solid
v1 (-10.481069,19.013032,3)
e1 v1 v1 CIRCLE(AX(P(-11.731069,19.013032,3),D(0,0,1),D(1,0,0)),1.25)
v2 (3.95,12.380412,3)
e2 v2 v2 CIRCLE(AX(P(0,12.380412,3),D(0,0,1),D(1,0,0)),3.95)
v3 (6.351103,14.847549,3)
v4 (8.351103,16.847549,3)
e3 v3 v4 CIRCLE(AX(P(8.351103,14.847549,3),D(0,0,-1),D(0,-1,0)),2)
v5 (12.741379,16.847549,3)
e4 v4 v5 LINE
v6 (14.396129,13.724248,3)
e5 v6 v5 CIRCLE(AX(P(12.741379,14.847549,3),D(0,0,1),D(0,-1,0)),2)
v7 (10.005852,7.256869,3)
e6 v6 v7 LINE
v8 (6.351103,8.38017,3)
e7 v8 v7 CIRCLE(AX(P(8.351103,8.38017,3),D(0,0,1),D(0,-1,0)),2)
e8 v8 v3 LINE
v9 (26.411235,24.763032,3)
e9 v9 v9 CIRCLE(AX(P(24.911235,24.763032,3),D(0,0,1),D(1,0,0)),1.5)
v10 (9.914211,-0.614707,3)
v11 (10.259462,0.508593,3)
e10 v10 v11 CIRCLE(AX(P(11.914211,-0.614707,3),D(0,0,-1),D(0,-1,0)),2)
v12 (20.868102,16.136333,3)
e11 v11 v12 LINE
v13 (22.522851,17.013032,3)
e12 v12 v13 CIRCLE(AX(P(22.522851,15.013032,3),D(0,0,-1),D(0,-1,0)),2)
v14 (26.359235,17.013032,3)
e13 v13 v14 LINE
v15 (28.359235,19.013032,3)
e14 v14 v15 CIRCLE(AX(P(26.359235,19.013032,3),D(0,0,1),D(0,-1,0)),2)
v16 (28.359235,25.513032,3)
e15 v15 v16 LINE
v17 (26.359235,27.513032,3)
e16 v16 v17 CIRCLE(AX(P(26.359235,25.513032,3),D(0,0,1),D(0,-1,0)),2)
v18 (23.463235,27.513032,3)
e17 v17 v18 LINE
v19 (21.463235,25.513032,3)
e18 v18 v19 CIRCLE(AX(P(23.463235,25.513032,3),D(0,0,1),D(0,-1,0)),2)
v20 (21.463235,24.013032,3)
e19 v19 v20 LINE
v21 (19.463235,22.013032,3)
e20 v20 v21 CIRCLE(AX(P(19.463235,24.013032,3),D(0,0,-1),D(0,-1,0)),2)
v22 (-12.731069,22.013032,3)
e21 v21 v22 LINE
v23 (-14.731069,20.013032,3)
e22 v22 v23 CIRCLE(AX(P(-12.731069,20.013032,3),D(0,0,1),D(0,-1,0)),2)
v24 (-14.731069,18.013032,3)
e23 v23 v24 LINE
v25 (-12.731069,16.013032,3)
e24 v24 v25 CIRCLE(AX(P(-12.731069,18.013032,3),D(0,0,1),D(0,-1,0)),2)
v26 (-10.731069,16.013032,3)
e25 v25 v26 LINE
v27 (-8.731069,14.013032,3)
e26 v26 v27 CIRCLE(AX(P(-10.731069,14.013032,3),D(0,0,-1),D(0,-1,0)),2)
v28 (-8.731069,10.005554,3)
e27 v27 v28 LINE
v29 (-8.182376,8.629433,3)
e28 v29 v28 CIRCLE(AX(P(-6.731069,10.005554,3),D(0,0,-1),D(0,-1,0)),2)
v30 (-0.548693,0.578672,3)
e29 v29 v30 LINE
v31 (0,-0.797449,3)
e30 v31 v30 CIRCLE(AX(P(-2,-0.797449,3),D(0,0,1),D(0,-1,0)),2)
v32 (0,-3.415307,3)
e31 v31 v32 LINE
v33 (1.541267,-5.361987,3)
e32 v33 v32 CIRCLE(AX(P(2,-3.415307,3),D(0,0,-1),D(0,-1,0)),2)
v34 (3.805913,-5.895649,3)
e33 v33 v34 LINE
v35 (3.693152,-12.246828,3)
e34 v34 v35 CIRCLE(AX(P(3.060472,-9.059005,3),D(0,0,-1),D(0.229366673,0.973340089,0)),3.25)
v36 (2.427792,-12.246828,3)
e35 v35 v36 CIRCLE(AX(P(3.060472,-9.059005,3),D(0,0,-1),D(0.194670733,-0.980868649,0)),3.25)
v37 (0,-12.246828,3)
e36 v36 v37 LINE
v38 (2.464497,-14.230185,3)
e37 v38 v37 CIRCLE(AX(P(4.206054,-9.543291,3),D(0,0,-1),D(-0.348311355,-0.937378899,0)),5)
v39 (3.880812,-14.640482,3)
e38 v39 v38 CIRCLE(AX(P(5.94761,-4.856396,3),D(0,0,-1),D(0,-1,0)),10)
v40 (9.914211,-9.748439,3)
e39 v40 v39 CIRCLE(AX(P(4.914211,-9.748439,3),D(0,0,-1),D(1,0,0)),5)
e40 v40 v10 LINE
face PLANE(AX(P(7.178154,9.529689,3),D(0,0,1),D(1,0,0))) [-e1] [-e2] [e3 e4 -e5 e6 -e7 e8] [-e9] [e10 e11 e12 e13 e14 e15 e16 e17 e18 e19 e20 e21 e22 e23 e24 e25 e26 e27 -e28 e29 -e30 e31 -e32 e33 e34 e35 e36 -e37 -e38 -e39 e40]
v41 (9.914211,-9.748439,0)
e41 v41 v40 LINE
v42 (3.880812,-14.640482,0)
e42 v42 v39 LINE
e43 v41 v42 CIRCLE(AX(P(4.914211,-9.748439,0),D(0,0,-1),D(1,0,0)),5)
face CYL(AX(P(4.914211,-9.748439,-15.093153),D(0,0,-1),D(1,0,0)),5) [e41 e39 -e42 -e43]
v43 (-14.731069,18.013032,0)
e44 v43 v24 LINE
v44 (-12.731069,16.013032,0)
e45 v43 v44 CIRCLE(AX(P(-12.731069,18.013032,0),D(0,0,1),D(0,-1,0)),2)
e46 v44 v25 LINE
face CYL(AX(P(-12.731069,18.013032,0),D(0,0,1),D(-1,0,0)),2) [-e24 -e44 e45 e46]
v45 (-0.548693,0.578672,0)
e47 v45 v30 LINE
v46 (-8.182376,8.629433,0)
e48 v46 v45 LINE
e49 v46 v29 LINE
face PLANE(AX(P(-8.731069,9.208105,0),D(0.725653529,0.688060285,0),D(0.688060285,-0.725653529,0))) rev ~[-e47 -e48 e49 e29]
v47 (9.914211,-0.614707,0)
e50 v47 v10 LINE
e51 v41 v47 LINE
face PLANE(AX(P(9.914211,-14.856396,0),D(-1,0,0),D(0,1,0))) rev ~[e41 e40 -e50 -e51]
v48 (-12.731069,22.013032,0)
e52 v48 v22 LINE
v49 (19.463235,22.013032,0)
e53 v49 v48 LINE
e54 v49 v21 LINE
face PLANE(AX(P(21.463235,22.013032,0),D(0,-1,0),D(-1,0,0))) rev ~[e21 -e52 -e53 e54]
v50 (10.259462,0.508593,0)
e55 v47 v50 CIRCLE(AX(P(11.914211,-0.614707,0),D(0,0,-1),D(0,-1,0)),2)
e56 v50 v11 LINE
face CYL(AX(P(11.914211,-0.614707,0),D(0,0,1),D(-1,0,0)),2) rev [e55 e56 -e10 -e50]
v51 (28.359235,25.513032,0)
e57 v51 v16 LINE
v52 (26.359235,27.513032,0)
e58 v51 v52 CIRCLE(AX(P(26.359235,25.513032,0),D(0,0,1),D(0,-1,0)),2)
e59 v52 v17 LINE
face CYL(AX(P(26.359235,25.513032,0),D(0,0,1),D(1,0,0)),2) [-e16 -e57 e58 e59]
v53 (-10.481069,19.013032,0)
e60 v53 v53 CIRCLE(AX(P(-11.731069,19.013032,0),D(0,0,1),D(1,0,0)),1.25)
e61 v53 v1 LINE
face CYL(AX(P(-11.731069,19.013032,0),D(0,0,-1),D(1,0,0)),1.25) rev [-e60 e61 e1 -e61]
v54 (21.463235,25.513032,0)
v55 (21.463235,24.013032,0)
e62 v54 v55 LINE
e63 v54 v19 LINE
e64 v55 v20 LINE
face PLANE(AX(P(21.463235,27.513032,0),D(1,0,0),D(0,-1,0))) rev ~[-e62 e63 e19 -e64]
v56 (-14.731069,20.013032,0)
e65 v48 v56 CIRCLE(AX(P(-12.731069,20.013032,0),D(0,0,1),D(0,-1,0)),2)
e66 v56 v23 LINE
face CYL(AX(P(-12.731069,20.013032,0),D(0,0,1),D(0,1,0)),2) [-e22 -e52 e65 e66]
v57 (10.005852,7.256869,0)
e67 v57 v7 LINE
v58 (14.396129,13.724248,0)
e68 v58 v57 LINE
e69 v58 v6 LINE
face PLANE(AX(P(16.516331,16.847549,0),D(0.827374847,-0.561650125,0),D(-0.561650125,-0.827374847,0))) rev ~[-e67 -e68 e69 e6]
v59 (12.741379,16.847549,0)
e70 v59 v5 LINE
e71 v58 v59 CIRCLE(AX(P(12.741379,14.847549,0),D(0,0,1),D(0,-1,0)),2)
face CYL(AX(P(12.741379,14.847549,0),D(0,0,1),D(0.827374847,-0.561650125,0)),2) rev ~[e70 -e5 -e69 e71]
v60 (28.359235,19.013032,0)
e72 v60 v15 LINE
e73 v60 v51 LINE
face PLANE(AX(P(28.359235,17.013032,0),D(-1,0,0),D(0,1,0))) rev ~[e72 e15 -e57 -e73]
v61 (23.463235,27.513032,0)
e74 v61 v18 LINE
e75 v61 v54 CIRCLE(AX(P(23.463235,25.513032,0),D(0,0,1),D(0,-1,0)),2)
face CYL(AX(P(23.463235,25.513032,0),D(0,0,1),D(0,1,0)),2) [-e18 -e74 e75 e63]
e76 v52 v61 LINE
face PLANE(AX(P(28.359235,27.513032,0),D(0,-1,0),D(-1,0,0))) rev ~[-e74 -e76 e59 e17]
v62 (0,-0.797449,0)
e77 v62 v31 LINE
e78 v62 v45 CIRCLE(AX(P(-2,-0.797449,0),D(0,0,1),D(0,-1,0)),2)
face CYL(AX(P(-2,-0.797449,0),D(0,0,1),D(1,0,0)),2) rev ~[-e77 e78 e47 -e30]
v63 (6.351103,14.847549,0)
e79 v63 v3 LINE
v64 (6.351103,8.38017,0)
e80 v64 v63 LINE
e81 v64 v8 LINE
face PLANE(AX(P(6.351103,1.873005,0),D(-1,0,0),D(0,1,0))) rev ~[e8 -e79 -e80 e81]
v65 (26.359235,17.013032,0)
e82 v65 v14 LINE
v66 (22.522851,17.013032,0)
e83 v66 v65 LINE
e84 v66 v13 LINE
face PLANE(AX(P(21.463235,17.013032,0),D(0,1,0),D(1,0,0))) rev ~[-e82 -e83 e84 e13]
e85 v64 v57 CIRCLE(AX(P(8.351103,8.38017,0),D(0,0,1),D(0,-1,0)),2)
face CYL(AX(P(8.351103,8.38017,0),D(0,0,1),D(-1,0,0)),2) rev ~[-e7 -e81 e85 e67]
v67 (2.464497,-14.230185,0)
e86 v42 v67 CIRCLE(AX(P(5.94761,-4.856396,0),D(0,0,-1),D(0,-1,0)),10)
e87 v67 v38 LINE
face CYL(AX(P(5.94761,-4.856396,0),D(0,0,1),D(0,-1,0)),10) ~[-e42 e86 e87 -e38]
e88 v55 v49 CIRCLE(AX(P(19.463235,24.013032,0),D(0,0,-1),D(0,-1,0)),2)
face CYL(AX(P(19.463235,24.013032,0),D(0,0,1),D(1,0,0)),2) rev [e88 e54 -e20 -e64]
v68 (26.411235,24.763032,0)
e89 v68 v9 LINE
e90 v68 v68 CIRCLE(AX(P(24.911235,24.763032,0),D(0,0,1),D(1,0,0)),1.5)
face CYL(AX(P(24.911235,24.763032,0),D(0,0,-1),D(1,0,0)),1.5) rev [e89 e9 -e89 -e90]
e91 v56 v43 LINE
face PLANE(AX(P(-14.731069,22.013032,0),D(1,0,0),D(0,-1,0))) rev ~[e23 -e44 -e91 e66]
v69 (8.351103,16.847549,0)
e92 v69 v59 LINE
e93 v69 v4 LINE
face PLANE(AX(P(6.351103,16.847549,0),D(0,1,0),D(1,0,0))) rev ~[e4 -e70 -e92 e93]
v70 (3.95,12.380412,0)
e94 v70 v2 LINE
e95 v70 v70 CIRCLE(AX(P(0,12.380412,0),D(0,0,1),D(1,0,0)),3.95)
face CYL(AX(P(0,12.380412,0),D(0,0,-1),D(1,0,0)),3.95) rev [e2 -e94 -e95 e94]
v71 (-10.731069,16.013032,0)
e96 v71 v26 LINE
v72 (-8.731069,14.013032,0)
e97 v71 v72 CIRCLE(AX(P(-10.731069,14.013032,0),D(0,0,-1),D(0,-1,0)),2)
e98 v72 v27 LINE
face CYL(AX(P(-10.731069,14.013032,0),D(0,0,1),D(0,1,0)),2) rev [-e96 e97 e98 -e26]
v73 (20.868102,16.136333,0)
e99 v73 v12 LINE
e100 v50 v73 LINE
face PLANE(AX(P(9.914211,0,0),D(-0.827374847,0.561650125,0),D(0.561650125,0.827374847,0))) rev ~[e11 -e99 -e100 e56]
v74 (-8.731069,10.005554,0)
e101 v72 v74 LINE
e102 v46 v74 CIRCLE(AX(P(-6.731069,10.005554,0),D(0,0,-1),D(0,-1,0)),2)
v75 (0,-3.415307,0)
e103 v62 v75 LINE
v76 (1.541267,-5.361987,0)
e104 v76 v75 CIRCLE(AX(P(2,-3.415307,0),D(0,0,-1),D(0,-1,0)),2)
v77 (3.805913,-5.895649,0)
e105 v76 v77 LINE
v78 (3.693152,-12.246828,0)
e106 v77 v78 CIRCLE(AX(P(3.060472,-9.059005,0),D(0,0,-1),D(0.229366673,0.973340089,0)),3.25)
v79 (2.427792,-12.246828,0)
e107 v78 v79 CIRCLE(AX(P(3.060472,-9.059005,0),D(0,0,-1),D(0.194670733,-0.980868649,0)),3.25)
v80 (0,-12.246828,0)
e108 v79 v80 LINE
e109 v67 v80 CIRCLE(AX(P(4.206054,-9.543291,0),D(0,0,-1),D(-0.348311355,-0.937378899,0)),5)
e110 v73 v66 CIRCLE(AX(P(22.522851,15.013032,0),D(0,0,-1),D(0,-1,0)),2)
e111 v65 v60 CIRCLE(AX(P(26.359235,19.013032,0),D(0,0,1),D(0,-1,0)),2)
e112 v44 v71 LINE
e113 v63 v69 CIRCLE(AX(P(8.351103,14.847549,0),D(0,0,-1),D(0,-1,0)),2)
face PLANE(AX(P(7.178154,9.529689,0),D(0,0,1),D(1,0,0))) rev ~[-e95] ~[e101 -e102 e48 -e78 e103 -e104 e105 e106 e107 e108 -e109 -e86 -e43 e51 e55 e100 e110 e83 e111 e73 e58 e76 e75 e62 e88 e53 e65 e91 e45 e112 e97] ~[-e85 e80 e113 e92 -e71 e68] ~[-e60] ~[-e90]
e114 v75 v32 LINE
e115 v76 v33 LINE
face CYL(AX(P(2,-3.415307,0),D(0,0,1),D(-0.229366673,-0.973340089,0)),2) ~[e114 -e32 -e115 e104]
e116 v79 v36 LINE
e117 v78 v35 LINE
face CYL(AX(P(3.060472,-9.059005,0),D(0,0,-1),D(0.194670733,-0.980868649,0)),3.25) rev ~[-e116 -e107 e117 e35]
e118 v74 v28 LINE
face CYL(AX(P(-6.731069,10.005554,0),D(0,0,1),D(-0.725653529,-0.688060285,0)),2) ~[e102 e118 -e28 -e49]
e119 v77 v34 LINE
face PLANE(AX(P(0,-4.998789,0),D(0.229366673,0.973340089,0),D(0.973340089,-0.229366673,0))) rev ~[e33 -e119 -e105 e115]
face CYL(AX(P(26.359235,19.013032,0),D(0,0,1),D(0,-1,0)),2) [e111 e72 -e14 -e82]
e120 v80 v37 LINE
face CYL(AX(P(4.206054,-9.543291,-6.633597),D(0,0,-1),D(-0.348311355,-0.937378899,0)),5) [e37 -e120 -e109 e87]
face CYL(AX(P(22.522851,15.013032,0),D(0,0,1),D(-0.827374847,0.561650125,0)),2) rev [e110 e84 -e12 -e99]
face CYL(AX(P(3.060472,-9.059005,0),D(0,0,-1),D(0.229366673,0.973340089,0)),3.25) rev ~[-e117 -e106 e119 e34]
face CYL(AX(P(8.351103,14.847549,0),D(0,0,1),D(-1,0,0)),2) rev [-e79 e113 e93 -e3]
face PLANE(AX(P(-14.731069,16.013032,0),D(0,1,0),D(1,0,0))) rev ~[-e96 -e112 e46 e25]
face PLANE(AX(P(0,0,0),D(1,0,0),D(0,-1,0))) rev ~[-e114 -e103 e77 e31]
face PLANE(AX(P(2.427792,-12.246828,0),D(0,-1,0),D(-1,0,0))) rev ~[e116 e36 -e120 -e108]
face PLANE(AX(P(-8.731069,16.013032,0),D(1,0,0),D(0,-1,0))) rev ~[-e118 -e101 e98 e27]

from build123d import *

# Parameters (mm, degrees)
F0_R        = 3.95
F0_R_2      = 1.25
F0_R_3      = 1.5
F1_DEPTH    = 3
F2_R        = 10
F3_R        = 2
F4_T1_DEPTH = 16.2671931878
F4_T3_DEPTH = 33.1863063341


# Not quite as in the source:
# - a fillet or chamfer that OpenCascade refuses, or shapes differently, is made with other operations: its cross-section is extruded or revolved along the edge and cut away or added
# - a feature names something its author has since deleted; it is built from what else it names


with BuildPart() as f1:
    # F0 (on Top) → F1 (new body)
    with BuildSketch(Plane.XY):
        with BuildLine():
            Line((4.0200765709, -14.8563961814), (9.9142113018, -14.8563961814))
            Line((9.9142113018, -14.8563961814), (9.9142113018, -11.4412054596))
            Line((9.9142113018, -11.4412054596), (9.9142113018, 0))
            Line((9.9142113018, 0), (21.4632351379, 17.0130324811))
            Line((21.4632351379, 17.0130324811), (28.3592351379, 17.0130324811))
            Line((28.3592351379, 17.0130324811), (28.3592351379, 22.0130324811))
            Line((28.3592351379, 22.0130324811), (28.3592351379, 27.5130324811))
            Line((28.3592351379, 27.5130324811), (21.4632351379, 27.5130324811))
            Line((21.4632351379, 27.5130324811), (21.4632351379, 22.0130324811))
            Line((21.4632351379, 22.0130324811), (-8.7310690433, 22.0130324811))
            Line((-8.7310690433, 22.0130324811), (-14.7310690433, 22.0130324811))
            Line((-14.7310690433, 22.0130324811), (-14.7310690433, 16.0130324811))
            Line((-14.7310690433, 16.0130324811), (-8.7310690433, 16.0130324811))
            Line((-8.7310690433, 16.0130324811), (-8.7310690433, 9.2081045732))
            Line((-8.7310690433, 9.2081045732), (0, 0))
            Line((0, 0), (0, -4.9987894588))
            Line((0, -4.9987894588), (3.805913418, -5.8956493604))
            ThreePointArc((3.805913418, -5.8956493604), (6.3099596188, -9.1166975853), (3.693151613, -12.2468277588))
            ThreePointArc((3.693151613, -12.2468277588), (3.0604717322, -12.3090046508), (2.4277918514, -12.2468277588))
            Line((2.4277918514, -12.2468277588), (0, -12.2468277588))
            Line((0, -12.2468277588), (0, -13.2468277588))
            Line((0, -13.2468277588), (4.0200765709, -14.8563961814))
        make_face()
        with Locations((0, 12.3804118484)):
            Circle(F0_R, mode=Mode.SUBTRACT)
        with Locations((-11.7310690433, 19.0130324811)):
            Circle(F0_R_2, mode=Mode.SUBTRACT)
        Polygon((6.3511028036, 16.8475485612), (16.5163309854, 16.8475485612), (6.3511028036, 1.8730052848), align=None, mode=Mode.SUBTRACT)
        with Locations((24.9112351379, 24.7630324811)):
            Circle(F0_R_3, mode=Mode.SUBTRACT)
    extrude(amount=F1_DEPTH)

    # F2
    f2_edges = [f1.edges().sort_by_distance(p)[0] for p in [
        (4.020077, -14.856396, 1.5),
    ]]
    fillet(f2_edges, radius=F2_R)

    # F3
    f3_edges = [f1.edges().sort_by_distance(p)[0] for p in [
        (21.463235, 22.013032, 1.5),
        (-8.731069, 9.208105, 1.5),
        (21.463235, 17.013032, 1.5),
        (0, 0, 1.5),
        (0, -4.998789, 1.5),
        (9.914211, 0, 1.5),
        (6.351103, 16.847549, 1.5),
        (16.516331, 16.847549, 1.5),
        (6.351103, 1.873005, 1.5),
        (-14.731069, 16.013032, 1.5),
        (-14.731069, 22.013032, 1.5),
        (28.359235, 27.513032, 1.5),
        (21.463235, 27.513032, 1.5),
        (28.359235, 17.013032, 1.5),
        (-8.731069, 16.013032, 1.5),
    ]]
    fillet(f3_edges, radius=F3_R)

    # F4: fillet of radius 5 on 2 edges, made by hand

    # F4_s2 → F4_t1 (cut)
    with BuildSketch(Plane.XY.offset(-6.6335965939)):
        with BuildLine():
            ThreePointArc((2.4644968667, -14.2301851696), (1.0712579431, -13.4385513762), (0, -12.2468277588))
            Line((0, -12.2468277588), (-0.4206053642, -12.5171814672))
            ThreePointArc((-0.4206053642, -12.5171814672), (-0.5, -12.7468277588), (-0.5, -13.2468277588))
            Line((-0.5, -13.2468277588), (-0.1858483979, -13.7110048511))
            ThreePointArc((-0.1858483979, -13.7110048511), (2.0447940609, -14.6041151192), (2.2903411892, -14.698874619))
            Line((2.2903411892, -14.698874619), (2.4644968667, -14.2301851696))
        make_face()
    extrude(amount=F4_T1_DEPTH, mode=Mode.SUBTRACT)

    # F4_s4 → F4_t3 (cut)
    with BuildSketch(Plane.XY.offset(-15.0931531671)):
        with BuildLine():
            ThreePointArc((9.9142113018, -9.7484393403), (8.063259128, -13.6321872452), (3.8808121864, -14.6404824992))
            Line((3.8808121864, -14.6404824992), (3.7774722749, -15.1296868151))
            ThreePointArc((3.7774722749, -15.1296868151), (5.9476104172, -15.3563961814), (9.9142113018, -15.3563961814))
            Line((9.9142113018, -15.3563961814), (10.4142113018, -14.8563961814))
            Line((10.4142113018, -14.8563961814), (10.4142113018, -9.7484393403))
            Line((10.4142113018, -9.7484393403), (9.9142113018, -9.7484393403))
        make_face()
    extrude(amount=F4_T3_DEPTH, mode=Mode.SUBTRACT)


solid = f1.part
